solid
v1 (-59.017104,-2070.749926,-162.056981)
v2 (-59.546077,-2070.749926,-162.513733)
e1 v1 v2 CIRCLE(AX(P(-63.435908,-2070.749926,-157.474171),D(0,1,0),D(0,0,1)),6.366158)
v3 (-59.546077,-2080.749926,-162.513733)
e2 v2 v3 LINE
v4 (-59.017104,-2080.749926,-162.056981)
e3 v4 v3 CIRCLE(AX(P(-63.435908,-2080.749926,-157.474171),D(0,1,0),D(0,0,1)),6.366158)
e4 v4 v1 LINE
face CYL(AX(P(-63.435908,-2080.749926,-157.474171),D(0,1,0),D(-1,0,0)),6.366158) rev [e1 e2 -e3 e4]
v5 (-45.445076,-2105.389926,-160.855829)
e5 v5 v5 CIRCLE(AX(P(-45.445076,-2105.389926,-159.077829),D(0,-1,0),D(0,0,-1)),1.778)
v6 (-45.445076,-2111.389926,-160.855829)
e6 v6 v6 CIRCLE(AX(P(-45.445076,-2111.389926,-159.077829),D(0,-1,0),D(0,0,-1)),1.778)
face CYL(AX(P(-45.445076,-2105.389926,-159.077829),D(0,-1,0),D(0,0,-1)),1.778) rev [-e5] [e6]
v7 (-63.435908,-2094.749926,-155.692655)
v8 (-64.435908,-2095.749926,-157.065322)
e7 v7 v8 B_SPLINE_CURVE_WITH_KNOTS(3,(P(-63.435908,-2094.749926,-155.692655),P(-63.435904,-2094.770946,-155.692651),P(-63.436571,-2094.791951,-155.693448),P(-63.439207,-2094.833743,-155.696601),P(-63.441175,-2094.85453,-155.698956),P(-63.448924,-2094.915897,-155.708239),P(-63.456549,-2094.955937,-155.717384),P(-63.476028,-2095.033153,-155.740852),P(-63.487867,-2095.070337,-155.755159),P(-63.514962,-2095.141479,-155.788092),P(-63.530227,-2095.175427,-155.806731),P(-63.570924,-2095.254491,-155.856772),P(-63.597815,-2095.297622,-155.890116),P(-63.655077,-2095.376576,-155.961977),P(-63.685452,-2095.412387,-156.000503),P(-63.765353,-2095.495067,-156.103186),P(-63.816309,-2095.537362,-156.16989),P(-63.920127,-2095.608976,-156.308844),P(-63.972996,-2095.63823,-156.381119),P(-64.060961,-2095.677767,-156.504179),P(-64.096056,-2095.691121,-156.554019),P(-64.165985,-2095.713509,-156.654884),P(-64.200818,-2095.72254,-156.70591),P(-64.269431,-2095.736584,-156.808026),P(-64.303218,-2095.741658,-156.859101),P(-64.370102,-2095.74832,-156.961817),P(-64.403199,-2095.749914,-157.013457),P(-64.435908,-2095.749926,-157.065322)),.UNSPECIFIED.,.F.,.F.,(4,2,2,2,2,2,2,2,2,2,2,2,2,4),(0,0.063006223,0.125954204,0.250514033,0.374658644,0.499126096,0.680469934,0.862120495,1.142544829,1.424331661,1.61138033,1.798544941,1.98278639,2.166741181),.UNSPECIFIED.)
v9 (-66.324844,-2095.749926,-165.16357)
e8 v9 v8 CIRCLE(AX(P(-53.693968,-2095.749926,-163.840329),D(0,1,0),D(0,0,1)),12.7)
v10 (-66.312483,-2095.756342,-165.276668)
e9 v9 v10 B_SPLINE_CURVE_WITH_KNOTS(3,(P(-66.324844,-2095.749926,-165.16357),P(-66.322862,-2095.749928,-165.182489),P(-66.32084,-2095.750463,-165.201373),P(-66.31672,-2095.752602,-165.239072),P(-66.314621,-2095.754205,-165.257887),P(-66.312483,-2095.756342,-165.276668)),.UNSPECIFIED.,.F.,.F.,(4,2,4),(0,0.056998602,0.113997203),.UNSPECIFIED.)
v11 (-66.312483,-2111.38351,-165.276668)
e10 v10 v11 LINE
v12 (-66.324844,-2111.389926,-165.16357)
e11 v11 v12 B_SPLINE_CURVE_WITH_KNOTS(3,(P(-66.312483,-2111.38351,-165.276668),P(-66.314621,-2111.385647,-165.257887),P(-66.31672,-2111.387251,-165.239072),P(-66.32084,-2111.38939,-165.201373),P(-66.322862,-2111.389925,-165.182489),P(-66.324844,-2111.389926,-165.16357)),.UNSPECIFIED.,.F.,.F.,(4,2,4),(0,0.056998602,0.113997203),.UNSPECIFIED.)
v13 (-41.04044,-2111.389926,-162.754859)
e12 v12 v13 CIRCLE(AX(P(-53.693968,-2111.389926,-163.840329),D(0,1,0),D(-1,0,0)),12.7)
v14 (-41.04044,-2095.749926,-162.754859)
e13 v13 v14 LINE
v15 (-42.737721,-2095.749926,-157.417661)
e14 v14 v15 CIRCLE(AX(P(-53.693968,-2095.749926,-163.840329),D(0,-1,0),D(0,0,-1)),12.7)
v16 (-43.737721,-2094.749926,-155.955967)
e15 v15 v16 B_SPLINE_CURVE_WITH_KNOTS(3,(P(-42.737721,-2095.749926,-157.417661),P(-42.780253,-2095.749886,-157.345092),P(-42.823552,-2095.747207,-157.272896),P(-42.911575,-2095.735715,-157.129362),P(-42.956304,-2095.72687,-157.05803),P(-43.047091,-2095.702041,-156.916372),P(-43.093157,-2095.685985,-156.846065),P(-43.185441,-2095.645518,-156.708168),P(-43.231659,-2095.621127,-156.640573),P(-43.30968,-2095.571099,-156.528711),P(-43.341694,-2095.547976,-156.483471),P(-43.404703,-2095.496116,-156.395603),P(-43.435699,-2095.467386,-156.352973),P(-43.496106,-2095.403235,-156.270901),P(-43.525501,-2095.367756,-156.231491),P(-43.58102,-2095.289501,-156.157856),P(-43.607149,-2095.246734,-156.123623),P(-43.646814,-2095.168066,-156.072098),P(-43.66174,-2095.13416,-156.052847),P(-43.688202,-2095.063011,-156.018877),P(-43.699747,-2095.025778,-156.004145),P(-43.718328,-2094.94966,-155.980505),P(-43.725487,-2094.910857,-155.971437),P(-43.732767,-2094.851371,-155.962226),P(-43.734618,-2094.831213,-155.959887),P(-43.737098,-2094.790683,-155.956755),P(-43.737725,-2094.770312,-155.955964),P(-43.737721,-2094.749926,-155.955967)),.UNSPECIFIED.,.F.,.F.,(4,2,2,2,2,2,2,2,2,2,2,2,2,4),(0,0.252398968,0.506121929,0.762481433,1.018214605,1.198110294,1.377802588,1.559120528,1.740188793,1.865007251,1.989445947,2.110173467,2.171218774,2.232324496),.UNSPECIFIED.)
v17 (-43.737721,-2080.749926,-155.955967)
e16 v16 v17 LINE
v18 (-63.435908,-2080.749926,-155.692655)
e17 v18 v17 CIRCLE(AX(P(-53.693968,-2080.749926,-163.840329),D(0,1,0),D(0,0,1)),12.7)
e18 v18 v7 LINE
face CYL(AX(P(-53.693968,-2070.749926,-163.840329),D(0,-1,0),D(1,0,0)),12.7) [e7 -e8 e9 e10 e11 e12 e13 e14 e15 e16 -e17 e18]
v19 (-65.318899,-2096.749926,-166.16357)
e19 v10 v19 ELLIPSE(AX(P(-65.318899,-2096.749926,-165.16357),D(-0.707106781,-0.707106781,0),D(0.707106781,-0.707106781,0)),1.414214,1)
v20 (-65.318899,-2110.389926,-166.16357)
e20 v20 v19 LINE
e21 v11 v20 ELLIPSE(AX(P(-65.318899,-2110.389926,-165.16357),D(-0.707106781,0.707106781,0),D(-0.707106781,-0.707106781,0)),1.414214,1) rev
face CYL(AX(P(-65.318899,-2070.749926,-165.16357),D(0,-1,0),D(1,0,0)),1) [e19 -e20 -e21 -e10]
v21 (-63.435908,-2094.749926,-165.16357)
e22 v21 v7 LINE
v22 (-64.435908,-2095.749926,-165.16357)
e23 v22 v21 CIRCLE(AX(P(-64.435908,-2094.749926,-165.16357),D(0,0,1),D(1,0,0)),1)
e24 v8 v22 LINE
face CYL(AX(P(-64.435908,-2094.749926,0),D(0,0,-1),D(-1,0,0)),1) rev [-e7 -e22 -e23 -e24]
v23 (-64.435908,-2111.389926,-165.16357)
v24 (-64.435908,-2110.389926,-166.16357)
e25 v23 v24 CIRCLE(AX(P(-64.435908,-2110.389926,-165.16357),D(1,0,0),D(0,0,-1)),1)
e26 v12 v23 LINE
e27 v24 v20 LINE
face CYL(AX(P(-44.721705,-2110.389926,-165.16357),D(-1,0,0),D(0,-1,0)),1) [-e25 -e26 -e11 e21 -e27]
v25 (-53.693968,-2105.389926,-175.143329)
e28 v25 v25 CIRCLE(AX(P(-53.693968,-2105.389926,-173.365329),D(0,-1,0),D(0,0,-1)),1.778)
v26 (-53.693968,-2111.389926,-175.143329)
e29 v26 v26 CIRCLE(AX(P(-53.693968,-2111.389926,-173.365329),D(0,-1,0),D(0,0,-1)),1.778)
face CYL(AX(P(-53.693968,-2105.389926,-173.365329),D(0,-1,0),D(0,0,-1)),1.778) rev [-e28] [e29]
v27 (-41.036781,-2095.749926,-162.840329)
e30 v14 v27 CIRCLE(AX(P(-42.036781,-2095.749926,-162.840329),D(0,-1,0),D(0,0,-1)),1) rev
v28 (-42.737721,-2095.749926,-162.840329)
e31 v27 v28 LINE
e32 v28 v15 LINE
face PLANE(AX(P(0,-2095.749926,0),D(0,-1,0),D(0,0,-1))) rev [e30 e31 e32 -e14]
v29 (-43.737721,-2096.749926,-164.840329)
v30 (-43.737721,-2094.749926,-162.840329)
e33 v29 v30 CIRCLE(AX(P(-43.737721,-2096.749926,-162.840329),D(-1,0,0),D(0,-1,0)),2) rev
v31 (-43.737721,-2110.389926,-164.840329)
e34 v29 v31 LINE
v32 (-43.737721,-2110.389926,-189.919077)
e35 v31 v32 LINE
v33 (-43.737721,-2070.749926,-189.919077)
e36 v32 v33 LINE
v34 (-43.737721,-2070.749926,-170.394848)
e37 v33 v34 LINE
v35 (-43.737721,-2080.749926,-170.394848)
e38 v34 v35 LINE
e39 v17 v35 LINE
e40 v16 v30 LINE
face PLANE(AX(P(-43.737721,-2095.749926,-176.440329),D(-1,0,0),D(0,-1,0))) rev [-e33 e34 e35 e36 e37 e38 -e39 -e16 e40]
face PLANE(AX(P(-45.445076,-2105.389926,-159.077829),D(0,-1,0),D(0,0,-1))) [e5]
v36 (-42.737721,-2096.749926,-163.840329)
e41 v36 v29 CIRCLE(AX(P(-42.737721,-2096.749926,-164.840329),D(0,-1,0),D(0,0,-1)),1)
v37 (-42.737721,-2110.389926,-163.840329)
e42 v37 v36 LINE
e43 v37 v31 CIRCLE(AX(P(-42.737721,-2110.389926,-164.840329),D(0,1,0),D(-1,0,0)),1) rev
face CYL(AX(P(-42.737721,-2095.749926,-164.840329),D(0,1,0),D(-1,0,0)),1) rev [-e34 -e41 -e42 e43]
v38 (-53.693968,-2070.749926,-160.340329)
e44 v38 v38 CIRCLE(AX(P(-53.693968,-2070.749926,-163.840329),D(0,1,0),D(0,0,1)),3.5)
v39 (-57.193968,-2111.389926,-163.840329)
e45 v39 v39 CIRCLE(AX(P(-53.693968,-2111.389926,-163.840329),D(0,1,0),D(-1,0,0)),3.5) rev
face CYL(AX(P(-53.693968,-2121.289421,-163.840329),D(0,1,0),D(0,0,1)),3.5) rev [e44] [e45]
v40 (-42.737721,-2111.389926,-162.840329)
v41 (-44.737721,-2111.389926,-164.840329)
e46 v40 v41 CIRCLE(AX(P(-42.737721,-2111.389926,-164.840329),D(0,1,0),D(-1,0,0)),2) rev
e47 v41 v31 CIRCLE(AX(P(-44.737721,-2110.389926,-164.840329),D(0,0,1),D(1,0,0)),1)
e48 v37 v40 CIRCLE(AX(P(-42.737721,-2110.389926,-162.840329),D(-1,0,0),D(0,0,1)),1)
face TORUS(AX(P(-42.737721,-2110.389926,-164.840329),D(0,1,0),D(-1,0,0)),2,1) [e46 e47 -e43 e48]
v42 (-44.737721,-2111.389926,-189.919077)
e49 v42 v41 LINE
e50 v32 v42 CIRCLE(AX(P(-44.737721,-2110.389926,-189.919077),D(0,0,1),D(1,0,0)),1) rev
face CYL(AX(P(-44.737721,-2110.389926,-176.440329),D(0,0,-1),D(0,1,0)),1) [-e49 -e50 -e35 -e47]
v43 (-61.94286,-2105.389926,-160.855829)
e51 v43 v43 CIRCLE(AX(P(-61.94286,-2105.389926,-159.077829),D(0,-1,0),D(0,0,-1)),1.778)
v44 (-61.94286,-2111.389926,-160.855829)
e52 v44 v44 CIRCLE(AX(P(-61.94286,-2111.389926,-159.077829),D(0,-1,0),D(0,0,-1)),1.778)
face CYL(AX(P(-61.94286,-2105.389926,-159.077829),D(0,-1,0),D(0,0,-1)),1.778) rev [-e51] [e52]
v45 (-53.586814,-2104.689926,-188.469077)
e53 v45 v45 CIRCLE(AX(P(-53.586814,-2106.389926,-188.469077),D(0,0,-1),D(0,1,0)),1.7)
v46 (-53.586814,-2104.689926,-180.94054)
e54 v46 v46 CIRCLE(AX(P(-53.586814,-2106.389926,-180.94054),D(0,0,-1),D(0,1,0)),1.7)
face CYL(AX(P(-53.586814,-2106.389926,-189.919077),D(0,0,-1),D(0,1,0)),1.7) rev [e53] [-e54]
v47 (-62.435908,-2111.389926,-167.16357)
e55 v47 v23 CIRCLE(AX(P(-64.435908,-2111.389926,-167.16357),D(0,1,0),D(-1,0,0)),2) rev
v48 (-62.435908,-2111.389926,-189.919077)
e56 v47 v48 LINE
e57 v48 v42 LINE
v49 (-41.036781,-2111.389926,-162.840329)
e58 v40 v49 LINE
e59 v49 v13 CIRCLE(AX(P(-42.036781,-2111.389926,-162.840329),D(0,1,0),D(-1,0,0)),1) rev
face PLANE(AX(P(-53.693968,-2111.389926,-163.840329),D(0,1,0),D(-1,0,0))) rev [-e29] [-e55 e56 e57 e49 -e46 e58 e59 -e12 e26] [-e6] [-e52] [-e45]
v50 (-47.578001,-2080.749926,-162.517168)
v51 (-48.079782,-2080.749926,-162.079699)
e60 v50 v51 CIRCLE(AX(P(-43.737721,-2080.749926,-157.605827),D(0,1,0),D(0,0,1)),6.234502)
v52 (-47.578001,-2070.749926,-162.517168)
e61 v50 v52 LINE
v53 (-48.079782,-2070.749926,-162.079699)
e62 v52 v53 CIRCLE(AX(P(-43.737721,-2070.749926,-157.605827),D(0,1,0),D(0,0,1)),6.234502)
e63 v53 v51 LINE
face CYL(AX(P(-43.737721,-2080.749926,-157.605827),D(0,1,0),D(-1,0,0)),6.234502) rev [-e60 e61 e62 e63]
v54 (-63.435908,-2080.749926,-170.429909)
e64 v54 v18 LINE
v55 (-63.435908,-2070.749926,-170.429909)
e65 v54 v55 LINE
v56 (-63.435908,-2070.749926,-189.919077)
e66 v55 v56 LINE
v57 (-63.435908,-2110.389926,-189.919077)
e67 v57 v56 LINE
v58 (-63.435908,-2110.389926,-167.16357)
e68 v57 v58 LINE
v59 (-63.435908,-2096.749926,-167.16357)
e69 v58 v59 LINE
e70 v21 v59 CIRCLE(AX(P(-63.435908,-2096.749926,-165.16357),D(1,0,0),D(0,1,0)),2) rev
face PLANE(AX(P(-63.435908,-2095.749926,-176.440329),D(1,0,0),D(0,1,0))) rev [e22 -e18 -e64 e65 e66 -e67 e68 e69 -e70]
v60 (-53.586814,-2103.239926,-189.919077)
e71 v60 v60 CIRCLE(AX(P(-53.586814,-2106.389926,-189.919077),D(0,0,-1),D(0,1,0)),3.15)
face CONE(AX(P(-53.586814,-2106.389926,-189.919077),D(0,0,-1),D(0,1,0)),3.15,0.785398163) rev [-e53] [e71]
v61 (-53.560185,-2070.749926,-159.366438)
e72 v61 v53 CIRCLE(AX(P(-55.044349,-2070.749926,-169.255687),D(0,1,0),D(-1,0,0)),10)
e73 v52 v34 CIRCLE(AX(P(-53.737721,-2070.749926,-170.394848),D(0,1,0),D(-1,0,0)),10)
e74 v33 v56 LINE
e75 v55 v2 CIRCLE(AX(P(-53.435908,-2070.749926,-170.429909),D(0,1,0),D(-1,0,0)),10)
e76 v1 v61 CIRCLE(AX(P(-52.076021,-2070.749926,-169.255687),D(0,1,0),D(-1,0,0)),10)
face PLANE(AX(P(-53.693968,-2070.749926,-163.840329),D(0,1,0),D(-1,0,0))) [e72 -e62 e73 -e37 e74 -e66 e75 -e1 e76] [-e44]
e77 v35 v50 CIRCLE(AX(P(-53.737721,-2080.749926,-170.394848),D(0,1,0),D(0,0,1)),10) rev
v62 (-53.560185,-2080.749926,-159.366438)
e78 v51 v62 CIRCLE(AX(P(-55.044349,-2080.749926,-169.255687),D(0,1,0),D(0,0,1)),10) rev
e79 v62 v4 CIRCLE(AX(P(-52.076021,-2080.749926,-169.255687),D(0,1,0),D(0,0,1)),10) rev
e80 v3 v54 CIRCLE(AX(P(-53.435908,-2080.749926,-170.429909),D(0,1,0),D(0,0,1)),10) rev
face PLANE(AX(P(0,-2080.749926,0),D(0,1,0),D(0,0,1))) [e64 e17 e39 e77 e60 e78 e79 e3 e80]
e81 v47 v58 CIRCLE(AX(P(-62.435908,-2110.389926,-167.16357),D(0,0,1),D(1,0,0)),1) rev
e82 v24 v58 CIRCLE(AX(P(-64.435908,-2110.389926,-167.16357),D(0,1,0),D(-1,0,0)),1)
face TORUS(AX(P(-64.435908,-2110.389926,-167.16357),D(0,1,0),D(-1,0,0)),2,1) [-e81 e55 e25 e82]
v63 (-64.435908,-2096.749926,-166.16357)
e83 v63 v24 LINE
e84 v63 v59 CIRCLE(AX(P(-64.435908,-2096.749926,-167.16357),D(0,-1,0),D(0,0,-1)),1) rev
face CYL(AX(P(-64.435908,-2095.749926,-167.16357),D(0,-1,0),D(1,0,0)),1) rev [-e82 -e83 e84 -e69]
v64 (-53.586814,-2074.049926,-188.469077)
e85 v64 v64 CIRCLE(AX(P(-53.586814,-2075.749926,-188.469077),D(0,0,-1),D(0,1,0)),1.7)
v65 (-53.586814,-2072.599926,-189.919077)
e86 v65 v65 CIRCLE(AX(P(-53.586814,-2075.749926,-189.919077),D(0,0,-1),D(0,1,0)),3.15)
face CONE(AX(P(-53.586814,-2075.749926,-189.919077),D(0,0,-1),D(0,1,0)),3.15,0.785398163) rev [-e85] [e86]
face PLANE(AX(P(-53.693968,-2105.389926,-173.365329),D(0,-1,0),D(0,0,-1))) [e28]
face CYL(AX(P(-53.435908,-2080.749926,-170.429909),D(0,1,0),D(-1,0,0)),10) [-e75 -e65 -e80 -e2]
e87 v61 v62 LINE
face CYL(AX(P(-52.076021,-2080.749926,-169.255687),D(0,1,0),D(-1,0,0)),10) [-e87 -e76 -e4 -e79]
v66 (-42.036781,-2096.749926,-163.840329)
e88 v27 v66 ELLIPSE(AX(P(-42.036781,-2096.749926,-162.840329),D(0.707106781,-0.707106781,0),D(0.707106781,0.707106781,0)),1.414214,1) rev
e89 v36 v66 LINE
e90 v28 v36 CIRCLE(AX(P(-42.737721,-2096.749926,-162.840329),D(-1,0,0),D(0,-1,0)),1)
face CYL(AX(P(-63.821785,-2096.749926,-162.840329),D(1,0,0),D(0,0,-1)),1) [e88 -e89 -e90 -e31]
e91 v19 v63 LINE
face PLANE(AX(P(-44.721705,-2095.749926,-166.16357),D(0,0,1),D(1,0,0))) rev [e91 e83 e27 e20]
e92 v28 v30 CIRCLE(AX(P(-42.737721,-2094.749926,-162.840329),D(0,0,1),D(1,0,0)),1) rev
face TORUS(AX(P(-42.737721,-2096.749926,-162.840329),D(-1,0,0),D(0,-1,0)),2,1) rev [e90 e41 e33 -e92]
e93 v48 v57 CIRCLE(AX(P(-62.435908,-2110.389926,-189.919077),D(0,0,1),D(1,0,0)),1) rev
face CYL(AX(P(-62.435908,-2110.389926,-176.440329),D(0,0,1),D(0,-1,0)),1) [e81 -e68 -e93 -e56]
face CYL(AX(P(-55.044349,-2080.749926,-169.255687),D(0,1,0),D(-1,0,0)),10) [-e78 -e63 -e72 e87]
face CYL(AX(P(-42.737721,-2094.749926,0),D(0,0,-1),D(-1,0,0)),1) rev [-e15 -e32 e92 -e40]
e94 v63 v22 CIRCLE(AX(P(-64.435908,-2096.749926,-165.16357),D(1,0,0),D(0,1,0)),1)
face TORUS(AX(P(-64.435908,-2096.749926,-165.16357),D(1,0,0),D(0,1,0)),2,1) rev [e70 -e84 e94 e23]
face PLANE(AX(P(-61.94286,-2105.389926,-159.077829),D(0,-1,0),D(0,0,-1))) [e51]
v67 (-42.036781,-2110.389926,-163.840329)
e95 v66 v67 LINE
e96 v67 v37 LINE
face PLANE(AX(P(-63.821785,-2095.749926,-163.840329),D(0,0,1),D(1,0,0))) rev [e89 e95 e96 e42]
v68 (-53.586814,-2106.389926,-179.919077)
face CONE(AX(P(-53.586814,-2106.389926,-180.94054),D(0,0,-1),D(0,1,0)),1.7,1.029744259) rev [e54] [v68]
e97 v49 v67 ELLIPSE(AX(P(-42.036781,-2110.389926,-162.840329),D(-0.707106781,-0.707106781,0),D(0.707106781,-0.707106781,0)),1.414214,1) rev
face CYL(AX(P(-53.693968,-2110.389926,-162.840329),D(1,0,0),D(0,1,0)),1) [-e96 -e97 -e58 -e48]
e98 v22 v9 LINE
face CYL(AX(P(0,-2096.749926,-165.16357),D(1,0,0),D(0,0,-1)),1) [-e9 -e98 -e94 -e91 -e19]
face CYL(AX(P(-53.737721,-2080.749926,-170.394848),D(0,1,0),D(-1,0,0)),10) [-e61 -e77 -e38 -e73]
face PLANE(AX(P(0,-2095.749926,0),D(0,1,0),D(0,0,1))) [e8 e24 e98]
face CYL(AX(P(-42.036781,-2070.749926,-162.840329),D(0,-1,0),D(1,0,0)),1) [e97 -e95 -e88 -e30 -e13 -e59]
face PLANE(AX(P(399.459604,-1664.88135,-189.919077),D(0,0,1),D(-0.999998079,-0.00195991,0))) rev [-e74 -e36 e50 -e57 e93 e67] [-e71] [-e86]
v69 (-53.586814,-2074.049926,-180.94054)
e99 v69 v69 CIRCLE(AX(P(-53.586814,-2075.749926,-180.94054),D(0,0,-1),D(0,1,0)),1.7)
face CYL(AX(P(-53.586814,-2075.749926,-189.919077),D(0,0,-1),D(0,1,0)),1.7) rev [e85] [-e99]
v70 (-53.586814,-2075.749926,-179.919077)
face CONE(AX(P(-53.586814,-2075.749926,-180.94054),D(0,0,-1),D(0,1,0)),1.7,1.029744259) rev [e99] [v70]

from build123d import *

# Parameters (mm, degrees)
SKETCH2_R                                      = 12.7
BOSS_EXTRUDE6_DEPTH                            = 40.64
SKETCH3_R                                      = 3.5
CUT_EXTRUDE1_DEPTH                             = 40.64
SKETCH4_R                                      = 1.778
CUT_EXTRUDE2_DEPTH                             = 6
BOSS_EXTRUDE8_DEPTH                            = 10
SKETCH8_W                                      = 25.185693912
SKETCH8_H                                      = 10
BOSS_EXTRUDE9_DEPTH                            = 7.284789049
BOSS_EXTRUDE10_DEPTH                           = 30.64
CSK_FOR_M3_FLAT_HEAD_MACHINE_SCREW1_AT_2_COUNT = 2
CSK_FOR_M3_FLAT_HEAD_MACHINE_SCREW1_AT_2_PITCH = 9.039543014
CSK_FOR_M3_FLAT_HEAD_MACHINE_SCREW1_AT_3_COUNT = 2
CSK_FOR_M3_FLAT_HEAD_MACHINE_SCREW1_AT_3_PITCH = 9.039543014
SKETCH16_W                                     = 3.769994858
SKETCH16_H                                     = 22.000968128
CUT_EXTRUDE3_DEPTH                             = 25
SKETCH17_W                                     = 10.276759259
SKETCH17_H                                     = 15.64
CUT_EXTRUDE4_DEPTH                             = 2.743753899
SKETCH18_W                                     = 12.6
SKETCH18_H                                     = 15.64
CUT_EXTRUDE5_DEPTH                             = 2.743753899
SKETCH20_W                                     = 2.743753899
SKETCH20_H                                     = 13.478747573
CUT_EXTRUDE7_DEPTH                             = 25
SKETCH21_W                                     = 5.741451758
SKETCH21_H                                     = 11.696500392
SKETCH21_W_2                                   = 5.938790765
BOSS_EXTRUDE12_DEPTH                           = 15
CUT_EXTRUDE8_START                             = -10
CUT_EXTRUDE8_DEPTH                             = 10
FILLET1_R                                      = 10
FILLET5_R                                      = 10
SKETCH23_W                                     = 2.743753899
SKETCH23_H                                     = 13.478747573
CUT_EXTRUDE9_DEPTH                             = 20
SKETCH24_W                                     = 5.557541457
SKETCH24_H                                     = 9.320824694
SKETCH24_W_2                                   = 5.259690838
BOSS_EXTRUDE13_DEPTH                           = 20
FILLET6_R                                      = 1


with BuildPart() as part:
    # Sketch2 → Boss-Extrude6 (new body)
    with BuildSketch(Plane(origin=(0, -2111.389926236, 0), x_dir=(1, 0, 0), z_dir=(0, 1, 0))):
        with Locations(Location((-53.693967541, 163.840329354, 0), (0, 0, 180))):
            Circle(SKETCH2_R)
    extrude(amount=BOSS_EXTRUDE6_DEPTH)

    # Sketch3 → Cut-Extrude1 (cut)
    with BuildSketch(Plane(origin=(0, -2070.749926236, 0), x_dir=(1, 0, 0), z_dir=(0, 1, 0))):
        with Locations(Location((-53.693967541, 163.840329354, 0), (0, 0, 270))):
            Circle(SKETCH3_R)
    extrude(amount=-CUT_EXTRUDE1_DEPTH, mode=Mode.SUBTRACT)

    # Sketch4 → Cut-Extrude2 (cut)
    with BuildSketch(Plane.XZ.offset(2111.389926236)):
        with Locations(Location((-61.942859512, -159.077829354, 0), (0, 0, 270))):
            Circle(SKETCH4_R)
        with Locations(Location((-53.693967541, -173.365329354, 0), (0, 0, 270))):
            Circle(SKETCH4_R)
        with Locations(Location((-45.44507557, -159.077829354, 0), (0, 0, 270))):
            Circle(SKETCH4_R)
    extrude(amount=-CUT_EXTRUDE2_DEPTH, mode=Mode.SUBTRACT)

    # Sketch7 → Boss-Extrude8 (add)
    with BuildSketch(Plane.XZ.offset(2111.389926236)):
        with BuildLine():
            Line((-40.993967541, -163.840329354), (-40.993967541, -182.634287878))
            Line((-40.993967541, -182.634287878), (-66.179661453, -182.634287878))
            Line((-66.179661453, -182.634287878), (-66.179661453, -166.163570095))
            ThreePointArc((-66.179661453, -166.163570095), (-52.527415502, -176.486639343), (-40.993967541, -163.840329354))
        make_face()
    extrude(amount=-BOSS_EXTRUDE8_DEPTH)

    # Sketch8 → Boss-Extrude9 (add)
    with BuildSketch(Plane(origin=(0, 0, -182.634287878), x_dir=(-1, 0, 0), z_dir=(0, 0, -1))):
        with Locations((53.586814497, -2106.389926236)):
            Rectangle(SKETCH8_W, SKETCH8_H)
    extrude(amount=BOSS_EXTRUDE9_DEPTH)

    # Sketch9 → Boss-Extrude10 (add)
    with BuildSketch(Plane(origin=(0, -2070.749926236, 0), x_dir=(1, 0, 0), z_dir=(0, 1, 0))):
        with BuildLine():
            Line((-66.179661453, 163.840329354), (-66.179661453, 189.919076927))
            Line((-66.179661453, 189.919076927), (-40.993967541, 189.919076927))
            Line((-40.993967541, 189.919076927), (-40.993967541, 163.840329354))
            ThreePointArc((-40.993967541, 163.840329354), (-53.586814497, 176.43317631), (-66.179661453, 163.840329354))
        make_face()
    extrude(amount=-BOSS_EXTRUDE10_DEPTH)

    # Sketch15 → CSK for M3 Flat Head Machine Screw1 (revolve, cut)
    with BuildSketch(Plane(origin=(-53.586814498, -2075.749926236, -189.919076927), x_dir=(0, 1, 0), z_dir=(1, 0, 0))):
        Polygon((0, 0), (0, 10), (1.7, 8.978536948), (1.7, 1.45), (3.15, 0), align=None)
    csk_for_m3_flat_head_machine_screw1 = revolve(axis=Axis((-53.586814498, -2075.749926236, -196.269076927), (0, 0, 1)), mode=Mode.SUBTRACT)

    # CSK for M3 Flat Head Machine Screw1 at 2: CSK for M3 Flat Head Machine Screw1 ×2
    with Locations(*[(-i * CSK_FOR_M3_FLAT_HEAD_MACHINE_SCREW1_AT_2_PITCH, 0, 0) for i in range(1, CSK_FOR_M3_FLAT_HEAD_MACHINE_SCREW1_AT_2_COUNT)]):
        add(csk_for_m3_flat_head_machine_screw1, mode=Mode.SUBTRACT)

    # CSK for M3 Flat Head Machine Screw1 at 3: CSK for M3 Flat Head Machine Screw1 ×2
    with Locations(*[(i * CSK_FOR_M3_FLAT_HEAD_MACHINE_SCREW1_AT_3_PITCH, 0, 0) for i in range(1, CSK_FOR_M3_FLAT_HEAD_MACHINE_SCREW1_AT_3_COUNT)]):
        add(csk_for_m3_flat_head_machine_screw1, mode=Mode.SUBTRACT)

    # Mirror1: CSK for M3 Flat Head Machine Screw1 across plane
    add(csk_for_m3_flat_head_machine_screw1.mirror(Plane.ZX.offset(-2091.069926234)), mode=Mode.SUBTRACT)

    # Mirror1 copy 1 sketch → Mirror1 copy 1 (revolve, cut)
    with BuildSketch(Plane(origin=(-62.626357512, -2106.389926232, -189.919076927), x_dir=(0, -1, 0), z_dir=(1, 0, 0))):
        Polygon((0, 0), (0, -10), (1.7, -8.978536948), (1.7, -1.45), (3.15, 0), align=None)
    revolve(axis=Axis((-62.626357512, -2106.389926232, -196.269076927), (0, 0, -1)), mode=Mode.SUBTRACT)

    # Mirror1 copy 2 sketch → Mirror1 copy 2 (revolve, cut)
    with BuildSketch(Plane(origin=(-44.547271484, -2106.389926232, -189.919076927), x_dir=(0, -1, 0), z_dir=(1, 0, 0))):
        Polygon((0, 0), (0, -10), (1.7, -8.978536948), (1.7, -1.45), (3.15, 0), align=None)
    revolve(axis=Axis((-44.547271484, -2106.389926232, -196.269076927), (0, 0, -1)), mode=Mode.SUBTRACT)

    # Sketch16 → Cut-Extrude3 (cut)
    with BuildSketch(Plane(origin=(0, -2070.749926236, 0), x_dir=(1, 0, 0), z_dir=(0, 1, 0))):
        with Locations((-65.320904983, 165.43984529)):
            Rectangle(SKETCH16_W, SKETCH16_H)
        with Locations((-41.852724011, 165.43984529)):
            Rectangle(SKETCH16_W, SKETCH16_H)
    extrude(amount=-CUT_EXTRUDE3_DEPTH, mode=Mode.SUBTRACT)

    # Sketch17 → Cut-Extrude4 (cut)
    with BuildSketch(Plane.ZY.offset(66.179661453)):
        with Locations((-171.301949724, -2103.569926236)):
            Rectangle(SKETCH17_W, SKETCH17_H)
    extrude(amount=-CUT_EXTRUDE4_DEPTH, mode=Mode.SUBTRACT)

    # Sketch18 → Cut-Extrude5 (cut)
    with BuildSketch(Plane(origin=(-40.993967541, 0, 0), x_dir=(0, 0, -1), z_dir=(1, 0, 0))):
        with Locations((170.140329354, -2103.569926236)):
            Rectangle(SKETCH18_W, SKETCH18_H)
    extrude(amount=-CUT_EXTRUDE5_DEPTH, mode=Mode.SUBTRACT)

    # Sketch20 → Cut-Extrude7 (cut)
    with BuildSketch(Plane(origin=(0, -2070.749926236, 0), x_dir=(1, 0, 0), z_dir=(0, 1, 0))):
        with Locations((-42.365844491, 183.179703141)):
            Rectangle(SKETCH20_W, SKETCH20_H)
        with Locations((-64.807784504, 183.179703141)):
            Rectangle(SKETCH20_W, SKETCH20_H)
    extrude(amount=-CUT_EXTRUDE7_DEPTH, mode=Mode.SUBTRACT)

    # Sketch21 → Boss-Extrude12 (add)
    with BuildSketch(Plane(origin=(0, 0, -189.919076927), x_dir=(-1, 0, 0), z_dir=(0, 0, -1))):
        with Locations((46.608447319, -2076.598176432)):
            Rectangle(SKETCH21_W, SKETCH21_H)
        with Locations((60.466512171, -2076.598176432)):
            Rectangle(SKETCH21_W_2, SKETCH21_H)
    extrude(amount=-BOSS_EXTRUDE12_DEPTH)

    # Sketch22 → Cut-Extrude8 (cut)
    with BuildSketch(Plane(origin=(0, -2070.749926236, 0), x_dir=(1, 0, 0), z_dir=(0, 1, 0)).offset(CUT_EXTRUDE8_START)):
        with BuildLine():
            Line((-49.74995705, 159.255687351), (-53.693967541, 159.255687351))
            Line((-53.693967541, 159.255687351), (-57.324101589, 159.255687351))
            ThreePointArc((-57.324101589, 159.255687351), (-59.615792554, 162.566782678), (-63.435907554, 163.840329354))
            Line((-63.435907554, 163.840329354), (-63.435907554, 159.255687351))
            Line((-63.435907554, 159.255687351), (-63.435907554, 155.692654546))
            ThreePointArc((-63.435907554, 155.692654546), (-53.52421717, 151.141463861), (-43.73772144, 155.95596739))
            Line((-43.73772144, 155.95596739), (-43.73772144, 159.255687351))
            Line((-43.73772144, 159.255687351), (-43.73772144, 163.840329354))
            ThreePointArc((-43.73772144, 163.840329354), (-47.518128803, 162.563400885), (-49.74995705, 159.255687351))
        make_face()
    extrude(amount=CUT_EXTRUDE8_DEPTH, mode=Mode.SUBTRACT)

    # Fillet1
    # the kernel refuses this fillet: 10 mm, written as the material it takes off along each edge
    with BuildSketch(Plane(origin=(-49.74995705, -2080.749926236, -159.255687351), x_dir=(-1, 0, 0), z_dir=(0, 1, 0))) as fillet1_piece_1:
        with BuildLine():
            CenterArc((5.294391522, -10), FILLET1_R, 90, 44.143408643)
            ThreePointArc((-1.670175142, -2.824011483), (-0.645987197, -1.523843369), (0, 0))
            Line((0, 0), (5.294391522, 0))
        make_face()
    extrude(amount=23.235978804, mode=Mode.SUBTRACT)
    with BuildSketch(Plane(origin=(-57.324101589, -2080.749926236, -159.255687351), x_dir=(1, 0, 0), z_dir=(0, 1, 0))) as fillet1_piece_2:
        with BuildLine():
            CenterArc((5.248080135, 10), FILLET1_R, 226.043798631, 43.956201369)
            ThreePointArc((-1.693002689, 2.80129392), (-0.663389254, 1.511313412), (0, 0))
            Line((0, 0), (5.248080135, 0))
        make_face()
    extrude(amount=23.120200338, mode=Mode.SUBTRACT)

    # Fillet5
    fillet5_edges = [part.edges().sort_by_distance(p)[0] for p in [
        (-43.73772144, -2075.749926236, -163.840329354),
        (-63.435907554, -2075.749926236, -163.840329354),
    ]]
    fillet(fillet5_edges, radius=FILLET5_R)

    # Sketch23 → Cut-Extrude9 (cut)
    with BuildSketch(Plane(origin=(0, -2095.749926236, 0), x_dir=(1, 0, 0), z_dir=(0, 1, 0))):
        with Locations((-64.807784504, 183.179703141)):
            Rectangle(SKETCH23_W, SKETCH23_H)
        with Locations((-42.365844491, 183.179703141)):
            Rectangle(SKETCH23_W, SKETCH23_H)
    extrude(amount=-CUT_EXTRUDE9_DEPTH, mode=Mode.SUBTRACT)

    # Sketch24 → Boss-Extrude13 (add)
    with BuildSketch(Plane(origin=(0, 0, -189.919076927), x_dir=(-1, 0, 0), z_dir=(0, 0, -1))):
        with Locations((46.516492169, -2106.729513889)):
            Rectangle(SKETCH24_W, SKETCH24_H)
        with Locations((60.806062135, -2106.729513889)):
            Rectangle(SKETCH24_W_2, SKETCH24_H)
    extrude(amount=-BOSS_EXTRUDE13_DEPTH)

    # Fillet6
    fillet6_edges = [part.edges().sort_by_distance(p)[0] for p in [
        (-63.435907554, -2095.749926236, -160.92811232),
        (-63.435907554, -2111.389926236, -183.17970314),
        (-64.807784503, -2111.389926236, -166.163570095),
        (-63.435907554, -2103.569926236, -166.163570095),
        (-64.807784503, -2095.749926236, -166.163570095),
        (-43.73772144, -2095.749926236, -159.898148372),
        (-42.365844491, -2095.749926236, -163.840329354),
        (-43.73772144, -2103.569926236, -163.840329354),
        (-42.365844491, -2111.389926236, -163.840329354),
        (-43.73772144, -2111.389926236, -183.17970314),
        (-66.179661453, -2103.569926236, -166.163570095),
        (-40.993967541, -2103.569926236, -163.840329354),
    ]]
    fillet(fillet6_edges, radius=FILLET6_R)


solid = part.part
